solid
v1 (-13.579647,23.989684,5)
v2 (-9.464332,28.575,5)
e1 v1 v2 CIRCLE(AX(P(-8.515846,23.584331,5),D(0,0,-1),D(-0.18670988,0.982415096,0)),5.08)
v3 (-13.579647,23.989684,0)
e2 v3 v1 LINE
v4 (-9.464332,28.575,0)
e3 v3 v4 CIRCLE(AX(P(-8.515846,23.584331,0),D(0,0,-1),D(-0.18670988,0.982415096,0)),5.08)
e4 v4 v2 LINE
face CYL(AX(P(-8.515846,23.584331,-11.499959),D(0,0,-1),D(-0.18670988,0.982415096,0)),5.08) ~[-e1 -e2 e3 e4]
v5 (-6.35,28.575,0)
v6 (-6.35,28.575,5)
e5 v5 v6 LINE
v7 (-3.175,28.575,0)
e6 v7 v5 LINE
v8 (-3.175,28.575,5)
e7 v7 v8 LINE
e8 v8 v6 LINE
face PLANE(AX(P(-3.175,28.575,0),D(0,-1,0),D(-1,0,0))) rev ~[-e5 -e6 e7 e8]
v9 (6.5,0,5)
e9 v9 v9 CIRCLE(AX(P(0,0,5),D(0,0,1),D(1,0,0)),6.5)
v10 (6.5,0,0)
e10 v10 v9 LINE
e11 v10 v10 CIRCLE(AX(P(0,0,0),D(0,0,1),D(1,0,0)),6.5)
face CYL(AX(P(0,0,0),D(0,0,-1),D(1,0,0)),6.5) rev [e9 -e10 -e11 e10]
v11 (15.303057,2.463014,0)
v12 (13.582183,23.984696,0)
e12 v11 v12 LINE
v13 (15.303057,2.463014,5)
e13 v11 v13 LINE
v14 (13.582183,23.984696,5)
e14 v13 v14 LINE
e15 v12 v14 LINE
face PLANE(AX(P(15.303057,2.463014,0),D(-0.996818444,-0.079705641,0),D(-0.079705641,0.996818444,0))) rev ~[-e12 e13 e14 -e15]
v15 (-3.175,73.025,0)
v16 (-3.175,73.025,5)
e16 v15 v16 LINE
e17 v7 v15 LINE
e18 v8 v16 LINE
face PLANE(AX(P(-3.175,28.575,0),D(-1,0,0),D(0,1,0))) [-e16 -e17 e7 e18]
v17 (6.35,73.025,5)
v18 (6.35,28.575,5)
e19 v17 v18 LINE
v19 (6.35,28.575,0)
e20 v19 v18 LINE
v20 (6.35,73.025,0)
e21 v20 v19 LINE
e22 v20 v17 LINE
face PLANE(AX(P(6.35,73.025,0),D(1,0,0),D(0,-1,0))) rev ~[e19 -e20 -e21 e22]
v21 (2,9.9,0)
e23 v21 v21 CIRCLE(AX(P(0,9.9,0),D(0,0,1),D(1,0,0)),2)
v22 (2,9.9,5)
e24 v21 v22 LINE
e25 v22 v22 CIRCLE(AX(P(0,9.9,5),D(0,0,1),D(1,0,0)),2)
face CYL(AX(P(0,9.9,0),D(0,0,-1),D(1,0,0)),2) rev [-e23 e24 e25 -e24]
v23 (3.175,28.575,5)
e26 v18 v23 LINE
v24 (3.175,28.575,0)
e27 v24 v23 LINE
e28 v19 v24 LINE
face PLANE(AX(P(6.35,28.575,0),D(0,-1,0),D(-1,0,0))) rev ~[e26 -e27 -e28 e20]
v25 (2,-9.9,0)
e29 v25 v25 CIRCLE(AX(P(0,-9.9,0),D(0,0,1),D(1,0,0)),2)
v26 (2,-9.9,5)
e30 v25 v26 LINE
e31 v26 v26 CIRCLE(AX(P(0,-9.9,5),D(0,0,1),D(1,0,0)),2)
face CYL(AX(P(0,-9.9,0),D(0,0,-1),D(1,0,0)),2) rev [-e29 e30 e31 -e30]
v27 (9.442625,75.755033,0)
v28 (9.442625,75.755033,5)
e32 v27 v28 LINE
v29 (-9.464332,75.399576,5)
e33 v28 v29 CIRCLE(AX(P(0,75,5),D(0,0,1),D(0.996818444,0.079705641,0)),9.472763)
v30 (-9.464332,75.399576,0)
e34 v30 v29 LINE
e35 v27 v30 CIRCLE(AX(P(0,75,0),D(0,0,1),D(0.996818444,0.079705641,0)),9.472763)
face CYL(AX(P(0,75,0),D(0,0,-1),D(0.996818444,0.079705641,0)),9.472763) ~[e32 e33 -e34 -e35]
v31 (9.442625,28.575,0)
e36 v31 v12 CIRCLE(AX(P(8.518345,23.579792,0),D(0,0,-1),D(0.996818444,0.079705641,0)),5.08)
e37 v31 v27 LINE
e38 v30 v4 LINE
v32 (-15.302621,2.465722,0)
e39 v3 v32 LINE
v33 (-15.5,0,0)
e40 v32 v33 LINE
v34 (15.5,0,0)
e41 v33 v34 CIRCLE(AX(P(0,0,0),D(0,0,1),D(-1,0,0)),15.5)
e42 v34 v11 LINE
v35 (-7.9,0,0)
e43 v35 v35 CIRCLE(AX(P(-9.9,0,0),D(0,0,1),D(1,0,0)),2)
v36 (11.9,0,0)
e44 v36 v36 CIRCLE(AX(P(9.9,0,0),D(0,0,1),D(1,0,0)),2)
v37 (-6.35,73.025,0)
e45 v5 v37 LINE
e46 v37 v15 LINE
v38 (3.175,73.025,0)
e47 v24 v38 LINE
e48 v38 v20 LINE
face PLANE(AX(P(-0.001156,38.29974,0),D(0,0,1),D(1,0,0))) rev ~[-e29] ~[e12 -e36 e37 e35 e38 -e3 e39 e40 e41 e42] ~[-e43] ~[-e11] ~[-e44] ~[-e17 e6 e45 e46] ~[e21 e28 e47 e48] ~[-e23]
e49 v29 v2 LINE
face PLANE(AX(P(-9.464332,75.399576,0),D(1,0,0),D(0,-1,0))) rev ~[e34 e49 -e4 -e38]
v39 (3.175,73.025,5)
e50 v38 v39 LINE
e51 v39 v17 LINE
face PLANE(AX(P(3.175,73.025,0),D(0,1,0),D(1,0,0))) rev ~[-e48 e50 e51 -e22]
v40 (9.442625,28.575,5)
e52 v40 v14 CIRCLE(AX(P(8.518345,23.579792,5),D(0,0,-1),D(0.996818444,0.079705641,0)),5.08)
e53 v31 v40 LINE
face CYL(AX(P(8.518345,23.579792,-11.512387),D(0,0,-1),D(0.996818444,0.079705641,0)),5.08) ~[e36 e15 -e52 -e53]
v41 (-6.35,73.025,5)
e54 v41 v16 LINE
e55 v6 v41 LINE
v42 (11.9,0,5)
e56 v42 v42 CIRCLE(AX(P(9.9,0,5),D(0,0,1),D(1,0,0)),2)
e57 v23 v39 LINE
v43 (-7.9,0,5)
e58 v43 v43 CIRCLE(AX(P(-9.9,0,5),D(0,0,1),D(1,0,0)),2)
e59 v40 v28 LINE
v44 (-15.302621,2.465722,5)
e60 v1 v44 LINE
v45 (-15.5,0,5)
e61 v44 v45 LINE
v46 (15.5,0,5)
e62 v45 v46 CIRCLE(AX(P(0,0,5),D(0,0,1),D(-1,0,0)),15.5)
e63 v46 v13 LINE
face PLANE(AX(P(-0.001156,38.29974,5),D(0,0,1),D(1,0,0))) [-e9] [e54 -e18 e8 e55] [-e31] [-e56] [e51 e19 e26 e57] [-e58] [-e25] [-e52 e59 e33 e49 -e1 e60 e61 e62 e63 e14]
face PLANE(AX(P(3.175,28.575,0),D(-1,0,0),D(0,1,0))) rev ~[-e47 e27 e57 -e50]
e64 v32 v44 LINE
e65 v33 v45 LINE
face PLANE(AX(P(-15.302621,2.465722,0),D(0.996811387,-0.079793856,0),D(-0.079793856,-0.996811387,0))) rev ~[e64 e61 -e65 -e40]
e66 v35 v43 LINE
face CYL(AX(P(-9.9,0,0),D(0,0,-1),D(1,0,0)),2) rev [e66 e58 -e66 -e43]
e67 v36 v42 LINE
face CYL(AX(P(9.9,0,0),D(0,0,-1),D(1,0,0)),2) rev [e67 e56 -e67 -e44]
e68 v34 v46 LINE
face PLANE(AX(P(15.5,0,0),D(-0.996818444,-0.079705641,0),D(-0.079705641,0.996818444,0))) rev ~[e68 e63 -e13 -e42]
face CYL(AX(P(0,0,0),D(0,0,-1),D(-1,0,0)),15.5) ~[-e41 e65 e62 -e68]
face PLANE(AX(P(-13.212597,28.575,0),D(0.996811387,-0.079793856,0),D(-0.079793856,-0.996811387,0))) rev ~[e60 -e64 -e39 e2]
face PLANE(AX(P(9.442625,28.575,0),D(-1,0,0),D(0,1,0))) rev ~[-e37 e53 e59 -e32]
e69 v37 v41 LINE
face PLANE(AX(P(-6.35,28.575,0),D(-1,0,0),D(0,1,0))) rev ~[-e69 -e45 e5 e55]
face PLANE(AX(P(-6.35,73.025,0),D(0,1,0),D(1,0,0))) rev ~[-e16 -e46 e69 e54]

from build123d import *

# Parameters (mm, degrees)
F0_R        = 2
F0_R_2      = 6.5
F0_W        = 6.35
F0_H        = 44.45
F1_DEPTH    = 5
F2_T1_DEPTH = 28.0247734337
F2_T3_DEPTH = 27.9999173435


# Not quite as in the source:
# - a fillet or chamfer that OpenCascade refuses, or shapes differently, is made with other operations: its cross-section is extruded or revolved along the edge and cut away or added


with BuildPart() as f1:
    # F0 (on Top) → F1 (new body)
    with BuildSketch(Plane.XY):
        with BuildLine():
            Line((-13.2125969287, 28.575), (-15.3026211582, 2.4657221432))
            ThreePointArc((-15.3026211582, 2.4657221432), (0.0013716989, 15.4999999393), (15.3030573351, 2.4630136415))
            Line((15.3030573351, 2.4630136415), (13.2151419082, 28.575))
            Line((13.2151419082, 28.575), (9.4426246963, 28.575))
            Line((9.4426246963, 28.575), (9.4426246963, 75.7550326315))
            ThreePointArc((9.4426246963, 75.7550326315), (-0.1780593733, 84.4710891818), (-9.464331693, 75.3995760688))
            Line((-9.464331693, 75.3995760688), (-9.464331693, 28.575))
            Line((-9.464331693, 28.575), (-13.2125969287, 28.575))
        make_face()
        Polygon((6.35, 73.025), (6.35, 28.575), (3.175, 28.575), (-3.175, 28.575), (-6.35, 28.575), (-6.35, 73.025), (-3.175, 73.025), (3.175, 73.025), align=None, mode=Mode.SUBTRACT)
        with BuildLine():
            Line((-15.3026211582, 2.4657221432), (-15.5, 0))
            ThreePointArc((-15.5, 0), (0, -15.5), (15.5, 0))
            Line((15.5, 0), (15.3030573351, 2.4630136415))
            ThreePointArc((15.3030573351, 2.4630136415), (0.0013716989, 15.4999999393), (-15.3026211582, 2.4657221432))
        make_face()
        with Locations((-9.9, 0)):
            Circle(F0_R, mode=Mode.SUBTRACT)
        with Locations((0, -9.9)):
            Circle(F0_R, mode=Mode.SUBTRACT)
        Circle(F0_R_2, mode=Mode.SUBTRACT)
        with Locations((9.9, 0)):
            Circle(F0_R, mode=Mode.SUBTRACT)
        with Locations((0, 9.9)):
            Circle(F0_R, mode=Mode.SUBTRACT)
        with Locations((0, 50.8)):
            Rectangle(F0_W, F0_H)
    extrude(amount=F1_DEPTH)

    # F2: fillet of radius 5.08 on 2 edges, made by hand

    # F2_s2 → F2_t1 (cut)
    with BuildSketch(Plane.XY.offset(-11.5123867168)):
        with BuildLine():
            ThreePointArc((13.5821827728, 23.9846962333), (12.2908918839, 26.9818924846), (9.4426246963, 28.575))
            Line((9.4426246963, 28.575), (13.2151419082, 28.575))
            Line((13.2151419082, 28.575), (13.5821827728, 23.9846962333))
        make_face()
    extrude(amount=F2_T1_DEPTH, mode=Mode.SUBTRACT)

    # F2_s4 → F2_t3 (cut)
    with BuildSketch(Plane.XY.offset(-11.4999586717)):
        with BuildLine():
            ThreePointArc((-9.464331693, 28.575), (-12.2964780323, 26.9774445837), (-13.579647346, 23.9896840999))
            Line((-13.579647346, 23.9896840999), (-13.2125969287, 28.575))
            Line((-13.2125969287, 28.575), (-9.464331693, 28.575))
        make_face()
    extrude(amount=F2_T3_DEPTH, mode=Mode.SUBTRACT)


solid = f1.part
